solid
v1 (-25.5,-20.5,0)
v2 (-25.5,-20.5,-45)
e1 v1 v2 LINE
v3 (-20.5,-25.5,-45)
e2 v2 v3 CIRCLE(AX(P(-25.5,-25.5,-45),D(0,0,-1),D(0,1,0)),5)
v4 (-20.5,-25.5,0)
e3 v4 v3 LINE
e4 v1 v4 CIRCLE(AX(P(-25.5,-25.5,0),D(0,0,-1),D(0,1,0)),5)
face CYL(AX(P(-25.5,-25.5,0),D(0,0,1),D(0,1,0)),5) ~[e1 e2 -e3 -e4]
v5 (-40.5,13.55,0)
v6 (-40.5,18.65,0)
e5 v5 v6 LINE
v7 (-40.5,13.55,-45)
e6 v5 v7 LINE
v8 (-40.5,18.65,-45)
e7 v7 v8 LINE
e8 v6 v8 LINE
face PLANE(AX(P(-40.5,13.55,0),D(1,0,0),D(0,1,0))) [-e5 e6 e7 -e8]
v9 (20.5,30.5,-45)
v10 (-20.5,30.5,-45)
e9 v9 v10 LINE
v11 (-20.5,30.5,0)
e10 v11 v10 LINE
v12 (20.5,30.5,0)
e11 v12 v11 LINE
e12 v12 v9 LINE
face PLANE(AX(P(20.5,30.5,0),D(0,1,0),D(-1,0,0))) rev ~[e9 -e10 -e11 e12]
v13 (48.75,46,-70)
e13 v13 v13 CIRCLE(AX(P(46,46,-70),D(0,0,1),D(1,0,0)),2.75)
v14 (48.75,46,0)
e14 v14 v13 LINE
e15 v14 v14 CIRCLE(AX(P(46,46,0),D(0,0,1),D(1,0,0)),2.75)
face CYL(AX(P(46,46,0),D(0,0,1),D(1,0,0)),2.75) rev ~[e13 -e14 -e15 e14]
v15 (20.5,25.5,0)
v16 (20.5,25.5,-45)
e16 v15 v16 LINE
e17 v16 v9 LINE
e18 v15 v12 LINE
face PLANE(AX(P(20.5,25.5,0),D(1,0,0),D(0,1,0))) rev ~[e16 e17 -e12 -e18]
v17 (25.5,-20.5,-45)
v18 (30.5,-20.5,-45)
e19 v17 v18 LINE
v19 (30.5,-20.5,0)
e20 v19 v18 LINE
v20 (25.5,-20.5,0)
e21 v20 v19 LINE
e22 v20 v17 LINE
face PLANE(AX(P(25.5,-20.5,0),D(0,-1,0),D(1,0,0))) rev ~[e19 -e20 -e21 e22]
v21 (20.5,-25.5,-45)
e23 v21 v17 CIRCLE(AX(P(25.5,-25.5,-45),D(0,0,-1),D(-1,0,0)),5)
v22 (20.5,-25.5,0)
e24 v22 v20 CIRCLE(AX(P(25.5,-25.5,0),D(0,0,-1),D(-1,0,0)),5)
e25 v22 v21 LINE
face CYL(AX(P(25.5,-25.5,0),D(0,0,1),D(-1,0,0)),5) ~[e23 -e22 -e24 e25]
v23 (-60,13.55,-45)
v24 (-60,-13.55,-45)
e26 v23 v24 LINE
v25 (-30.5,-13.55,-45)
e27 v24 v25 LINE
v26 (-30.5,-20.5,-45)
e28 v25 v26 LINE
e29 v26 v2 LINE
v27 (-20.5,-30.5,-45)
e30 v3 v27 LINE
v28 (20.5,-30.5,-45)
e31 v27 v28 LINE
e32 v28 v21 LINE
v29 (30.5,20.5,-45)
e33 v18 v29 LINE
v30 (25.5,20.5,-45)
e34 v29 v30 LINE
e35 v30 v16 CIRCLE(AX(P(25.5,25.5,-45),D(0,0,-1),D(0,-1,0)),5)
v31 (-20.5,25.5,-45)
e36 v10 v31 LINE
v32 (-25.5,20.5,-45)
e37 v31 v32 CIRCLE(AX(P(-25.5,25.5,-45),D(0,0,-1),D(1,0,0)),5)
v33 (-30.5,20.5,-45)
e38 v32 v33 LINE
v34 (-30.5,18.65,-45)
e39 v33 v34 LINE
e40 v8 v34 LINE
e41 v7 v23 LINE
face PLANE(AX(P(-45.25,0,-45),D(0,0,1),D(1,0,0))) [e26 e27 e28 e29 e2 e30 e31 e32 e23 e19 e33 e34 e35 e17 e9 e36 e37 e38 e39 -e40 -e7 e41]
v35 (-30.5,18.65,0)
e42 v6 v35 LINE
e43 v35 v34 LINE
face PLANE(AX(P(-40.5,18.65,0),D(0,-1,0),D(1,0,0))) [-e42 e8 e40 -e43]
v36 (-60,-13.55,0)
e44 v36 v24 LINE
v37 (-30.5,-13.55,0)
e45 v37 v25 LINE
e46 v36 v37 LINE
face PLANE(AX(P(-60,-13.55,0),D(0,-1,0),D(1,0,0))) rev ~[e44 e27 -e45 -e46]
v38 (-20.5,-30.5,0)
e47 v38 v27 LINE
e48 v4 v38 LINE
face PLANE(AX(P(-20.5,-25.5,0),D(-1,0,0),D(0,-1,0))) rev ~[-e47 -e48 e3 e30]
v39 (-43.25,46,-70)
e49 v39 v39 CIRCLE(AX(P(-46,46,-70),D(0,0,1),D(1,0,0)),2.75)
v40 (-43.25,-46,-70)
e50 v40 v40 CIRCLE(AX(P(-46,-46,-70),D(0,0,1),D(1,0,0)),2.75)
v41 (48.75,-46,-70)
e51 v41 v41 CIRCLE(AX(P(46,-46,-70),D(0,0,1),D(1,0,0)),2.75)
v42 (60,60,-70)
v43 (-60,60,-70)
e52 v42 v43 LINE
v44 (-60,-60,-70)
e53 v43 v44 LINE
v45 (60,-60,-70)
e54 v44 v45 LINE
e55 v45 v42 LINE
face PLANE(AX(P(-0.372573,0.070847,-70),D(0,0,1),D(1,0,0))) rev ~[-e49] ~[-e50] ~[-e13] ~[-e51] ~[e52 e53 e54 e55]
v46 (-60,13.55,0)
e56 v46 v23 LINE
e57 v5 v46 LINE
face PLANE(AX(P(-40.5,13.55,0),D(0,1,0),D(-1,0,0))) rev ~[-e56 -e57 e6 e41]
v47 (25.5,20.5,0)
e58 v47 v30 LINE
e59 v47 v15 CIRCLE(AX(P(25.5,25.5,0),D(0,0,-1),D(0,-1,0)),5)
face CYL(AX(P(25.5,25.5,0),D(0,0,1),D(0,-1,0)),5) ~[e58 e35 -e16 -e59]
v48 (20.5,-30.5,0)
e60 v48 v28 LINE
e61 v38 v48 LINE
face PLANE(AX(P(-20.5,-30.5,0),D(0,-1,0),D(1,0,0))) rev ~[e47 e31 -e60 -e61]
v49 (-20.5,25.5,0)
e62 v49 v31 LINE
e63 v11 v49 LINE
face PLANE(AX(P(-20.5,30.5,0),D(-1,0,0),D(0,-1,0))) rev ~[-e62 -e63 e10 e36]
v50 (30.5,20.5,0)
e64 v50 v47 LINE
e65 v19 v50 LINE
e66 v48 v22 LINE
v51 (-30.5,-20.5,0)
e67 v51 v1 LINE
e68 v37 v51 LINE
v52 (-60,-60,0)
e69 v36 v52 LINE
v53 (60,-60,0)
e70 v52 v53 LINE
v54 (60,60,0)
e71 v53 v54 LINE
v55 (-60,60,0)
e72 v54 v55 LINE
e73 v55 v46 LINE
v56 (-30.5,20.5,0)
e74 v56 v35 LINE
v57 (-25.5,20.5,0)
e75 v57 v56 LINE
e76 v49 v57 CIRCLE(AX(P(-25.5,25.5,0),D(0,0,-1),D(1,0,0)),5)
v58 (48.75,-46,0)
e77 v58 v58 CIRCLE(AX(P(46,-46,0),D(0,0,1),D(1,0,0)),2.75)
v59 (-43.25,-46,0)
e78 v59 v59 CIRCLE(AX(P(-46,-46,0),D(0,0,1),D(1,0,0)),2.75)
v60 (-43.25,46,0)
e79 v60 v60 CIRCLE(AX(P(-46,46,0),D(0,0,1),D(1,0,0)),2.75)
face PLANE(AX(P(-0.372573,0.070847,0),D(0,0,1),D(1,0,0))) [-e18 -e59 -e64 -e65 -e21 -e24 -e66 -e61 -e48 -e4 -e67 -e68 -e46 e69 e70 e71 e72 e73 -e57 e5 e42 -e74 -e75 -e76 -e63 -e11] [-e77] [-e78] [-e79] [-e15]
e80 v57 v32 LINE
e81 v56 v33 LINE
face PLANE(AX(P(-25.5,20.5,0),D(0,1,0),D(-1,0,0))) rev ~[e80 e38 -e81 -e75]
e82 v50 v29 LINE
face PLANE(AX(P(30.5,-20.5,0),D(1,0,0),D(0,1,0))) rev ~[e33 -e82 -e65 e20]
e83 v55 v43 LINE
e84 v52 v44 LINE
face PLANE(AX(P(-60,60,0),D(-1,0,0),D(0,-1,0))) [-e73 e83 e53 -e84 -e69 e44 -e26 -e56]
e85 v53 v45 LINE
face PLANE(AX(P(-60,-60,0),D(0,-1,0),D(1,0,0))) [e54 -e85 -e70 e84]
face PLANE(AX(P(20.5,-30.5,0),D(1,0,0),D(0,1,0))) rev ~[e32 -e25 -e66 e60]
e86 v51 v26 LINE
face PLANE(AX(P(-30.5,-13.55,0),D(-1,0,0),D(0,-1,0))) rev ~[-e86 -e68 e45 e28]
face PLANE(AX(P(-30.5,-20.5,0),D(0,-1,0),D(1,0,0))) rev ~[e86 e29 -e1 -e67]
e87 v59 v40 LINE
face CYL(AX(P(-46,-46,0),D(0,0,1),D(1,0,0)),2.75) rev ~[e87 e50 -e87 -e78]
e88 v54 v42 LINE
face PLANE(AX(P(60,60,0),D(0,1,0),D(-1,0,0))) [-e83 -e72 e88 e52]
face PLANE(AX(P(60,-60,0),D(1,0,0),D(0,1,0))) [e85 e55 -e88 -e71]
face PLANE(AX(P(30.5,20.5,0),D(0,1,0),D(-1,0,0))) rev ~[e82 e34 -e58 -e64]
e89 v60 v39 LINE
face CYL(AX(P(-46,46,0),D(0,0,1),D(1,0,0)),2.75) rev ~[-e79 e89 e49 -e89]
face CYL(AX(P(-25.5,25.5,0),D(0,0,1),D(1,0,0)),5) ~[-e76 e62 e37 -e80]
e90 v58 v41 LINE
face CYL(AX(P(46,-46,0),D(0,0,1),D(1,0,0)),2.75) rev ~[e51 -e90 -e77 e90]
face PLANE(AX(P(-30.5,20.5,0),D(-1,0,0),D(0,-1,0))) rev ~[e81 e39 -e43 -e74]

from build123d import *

# Parameters (mm, degrees)
F0_R     = 2.75
F0_W     = 10
F0_H     = 5.1
F1_DEPTH = 70
F2_DEPTH = 45


# Not quite as in the source:
# - a feature names something its author has since deleted; it is built from what else it names


with BuildPart() as f1:
    # F0 (on Top) → F1 (new body)
    with BuildSketch(Plane.XY):
        with BuildLine():
            Line((-60, -60), (60, -60))
            Line((60, -60), (60, 60))
            Line((60, 60), (-60, 60))
            Line((-60, 60), (-60, 13.55))
            Line((-60, 13.55), (-40.5, 13.55))
            Line((-40.5, 13.55), (-40.5, 18.65))
            Line((-40.5, 18.65), (-30.5, 18.65))
            Line((-30.5, 18.65), (-30.5, 20.5))
            Line((-30.5, 20.5), (-25.5, 20.5))
            ThreePointArc((-25.5, 20.5), (-21.9644660941, 21.9644660941), (-20.5, 25.5))
            Line((-20.5, 25.5), (-20.5, 30.5))
            Line((-20.5, 30.5), (20.5, 30.5))
            Line((20.5, 30.5), (20.5, 25.5))
            ThreePointArc((20.5, 25.5), (21.9644660941, 21.9644660941), (25.5, 20.5))
            Line((25.5, 20.5), (30.5, 20.5))
            Line((30.5, 20.5), (30.5, -20.5))
            Line((30.5, -20.5), (25.5, -20.5))
            ThreePointArc((25.5, -20.5), (21.9644660941, -21.9644660941), (20.5, -25.5))
            Line((20.5, -25.5), (20.5, -30.5))
            Line((20.5, -30.5), (-20.5, -30.5))
            Line((-20.5, -30.5), (-20.5, -25.5))
            ThreePointArc((-20.5, -25.5), (-21.9644660941, -21.9644660941), (-25.5, -20.5))
            Line((-25.5, -20.5), (-30.5, -20.5))
            Line((-30.5, -20.5), (-30.5, -18.65))
            Line((-30.5, -18.65), (-30.5, -13.55))
            Line((-30.5, -13.55), (-40.5, -13.55))
            Line((-40.5, -13.55), (-60, -13.55))
            Line((-60, -13.55), (-60, -18.65))
            Line((-60, -18.65), (-60, -60))
        make_face()
        with Locations((-46, -46)):
            Circle(F0_R, mode=Mode.SUBTRACT)
        with Locations((46, -46)):
            Circle(F0_R, mode=Mode.SUBTRACT)
        with Locations((-46, 46)):
            Circle(F0_R, mode=Mode.SUBTRACT)
        with Locations((46, 46)):
            Circle(F0_R, mode=Mode.SUBTRACT)
        Polygon((-60, 13.55), (-60, -13.55), (-40.5, -13.55), (-30.5, -13.55), (-30.5, 13.55), (-40.5, 13.55), align=None)
        with BuildLine():
            Line((-30.5, 13.55), (-30.5, -13.55))
            Line((-30.5, -13.55), (-30.5, -18.65))
            Line((-30.5, -18.65), (-30.5, -20.5))
            Line((-30.5, -20.5), (-25.5, -20.5))
            ThreePointArc((-25.5, -20.5), (-21.9644660941, -21.9644660941), (-20.5, -25.5))
            Line((-20.5, -25.5), (-20.5, -30.5))
            Line((-20.5, -30.5), (20.5, -30.5))
            Line((20.5, -30.5), (20.5, -25.5))
            ThreePointArc((20.5, -25.5), (21.9644660941, -21.9644660941), (25.5, -20.5))
            Line((25.5, -20.5), (30.5, -20.5))
            Line((30.5, -20.5), (30.5, 20.5))
            Line((30.5, 20.5), (25.5, 20.5))
            ThreePointArc((25.5, 20.5), (21.9644660941, 21.9644660941), (20.5, 25.5))
            Line((20.5, 25.5), (20.5, 30.5))
            Line((20.5, 30.5), (-20.5, 30.5))
            Line((-20.5, 30.5), (-20.5, 25.5))
            ThreePointArc((-20.5, 25.5), (-21.9644660941, 21.9644660941), (-25.5, 20.5))
            Line((-25.5, 20.5), (-30.5, 20.5))
            Line((-30.5, 20.5), (-30.5, 18.65))
            Line((-30.5, 18.65), (-30.5, 13.55))
        make_face()
        with Locations((-35.5, 16.1)):
            Rectangle(F0_W, F0_H)
    extrude(amount=-F1_DEPTH)

    # F0 (on Top) → F2 (cut)
    with BuildSketch(Plane.XY):
        Polygon((-60, 13.55), (-60, -13.55), (-40.5, -13.55), (-30.5, -13.55), (-30.5, 13.55), (-40.5, 13.55), align=None)
        with BuildLine():
            Line((-30.5, 13.55), (-30.5, -13.55))
            Line((-30.5, -13.55), (-30.5, -18.65))
            Line((-30.5, -18.65), (-30.5, -20.5))
            Line((-30.5, -20.5), (-25.5, -20.5))
            ThreePointArc((-25.5, -20.5), (-21.9644660941, -21.9644660941), (-20.5, -25.5))
            Line((-20.5, -25.5), (-20.5, -30.5))
            Line((-20.5, -30.5), (20.5, -30.5))
            Line((20.5, -30.5), (20.5, -25.5))
            ThreePointArc((20.5, -25.5), (21.9644660941, -21.9644660941), (25.5, -20.5))
            Line((25.5, -20.5), (30.5, -20.5))
            Line((30.5, -20.5), (30.5, 20.5))
            Line((30.5, 20.5), (25.5, 20.5))
            ThreePointArc((25.5, 20.5), (21.9644660941, 21.9644660941), (20.5, 25.5))
            Line((20.5, 25.5), (20.5, 30.5))
            Line((20.5, 30.5), (-20.5, 30.5))
            Line((-20.5, 30.5), (-20.5, 25.5))
            ThreePointArc((-20.5, 25.5), (-21.9644660941, 21.9644660941), (-25.5, 20.5))
            Line((-25.5, 20.5), (-30.5, 20.5))
            Line((-30.5, 20.5), (-30.5, 18.65))
            Line((-30.5, 18.65), (-30.5, 13.55))
        make_face()
        with Locations((-35.5, 16.1)):
            Rectangle(F0_W, F0_H)
    extrude(amount=-F2_DEPTH, mode=Mode.SUBTRACT)


solid = f1.part
